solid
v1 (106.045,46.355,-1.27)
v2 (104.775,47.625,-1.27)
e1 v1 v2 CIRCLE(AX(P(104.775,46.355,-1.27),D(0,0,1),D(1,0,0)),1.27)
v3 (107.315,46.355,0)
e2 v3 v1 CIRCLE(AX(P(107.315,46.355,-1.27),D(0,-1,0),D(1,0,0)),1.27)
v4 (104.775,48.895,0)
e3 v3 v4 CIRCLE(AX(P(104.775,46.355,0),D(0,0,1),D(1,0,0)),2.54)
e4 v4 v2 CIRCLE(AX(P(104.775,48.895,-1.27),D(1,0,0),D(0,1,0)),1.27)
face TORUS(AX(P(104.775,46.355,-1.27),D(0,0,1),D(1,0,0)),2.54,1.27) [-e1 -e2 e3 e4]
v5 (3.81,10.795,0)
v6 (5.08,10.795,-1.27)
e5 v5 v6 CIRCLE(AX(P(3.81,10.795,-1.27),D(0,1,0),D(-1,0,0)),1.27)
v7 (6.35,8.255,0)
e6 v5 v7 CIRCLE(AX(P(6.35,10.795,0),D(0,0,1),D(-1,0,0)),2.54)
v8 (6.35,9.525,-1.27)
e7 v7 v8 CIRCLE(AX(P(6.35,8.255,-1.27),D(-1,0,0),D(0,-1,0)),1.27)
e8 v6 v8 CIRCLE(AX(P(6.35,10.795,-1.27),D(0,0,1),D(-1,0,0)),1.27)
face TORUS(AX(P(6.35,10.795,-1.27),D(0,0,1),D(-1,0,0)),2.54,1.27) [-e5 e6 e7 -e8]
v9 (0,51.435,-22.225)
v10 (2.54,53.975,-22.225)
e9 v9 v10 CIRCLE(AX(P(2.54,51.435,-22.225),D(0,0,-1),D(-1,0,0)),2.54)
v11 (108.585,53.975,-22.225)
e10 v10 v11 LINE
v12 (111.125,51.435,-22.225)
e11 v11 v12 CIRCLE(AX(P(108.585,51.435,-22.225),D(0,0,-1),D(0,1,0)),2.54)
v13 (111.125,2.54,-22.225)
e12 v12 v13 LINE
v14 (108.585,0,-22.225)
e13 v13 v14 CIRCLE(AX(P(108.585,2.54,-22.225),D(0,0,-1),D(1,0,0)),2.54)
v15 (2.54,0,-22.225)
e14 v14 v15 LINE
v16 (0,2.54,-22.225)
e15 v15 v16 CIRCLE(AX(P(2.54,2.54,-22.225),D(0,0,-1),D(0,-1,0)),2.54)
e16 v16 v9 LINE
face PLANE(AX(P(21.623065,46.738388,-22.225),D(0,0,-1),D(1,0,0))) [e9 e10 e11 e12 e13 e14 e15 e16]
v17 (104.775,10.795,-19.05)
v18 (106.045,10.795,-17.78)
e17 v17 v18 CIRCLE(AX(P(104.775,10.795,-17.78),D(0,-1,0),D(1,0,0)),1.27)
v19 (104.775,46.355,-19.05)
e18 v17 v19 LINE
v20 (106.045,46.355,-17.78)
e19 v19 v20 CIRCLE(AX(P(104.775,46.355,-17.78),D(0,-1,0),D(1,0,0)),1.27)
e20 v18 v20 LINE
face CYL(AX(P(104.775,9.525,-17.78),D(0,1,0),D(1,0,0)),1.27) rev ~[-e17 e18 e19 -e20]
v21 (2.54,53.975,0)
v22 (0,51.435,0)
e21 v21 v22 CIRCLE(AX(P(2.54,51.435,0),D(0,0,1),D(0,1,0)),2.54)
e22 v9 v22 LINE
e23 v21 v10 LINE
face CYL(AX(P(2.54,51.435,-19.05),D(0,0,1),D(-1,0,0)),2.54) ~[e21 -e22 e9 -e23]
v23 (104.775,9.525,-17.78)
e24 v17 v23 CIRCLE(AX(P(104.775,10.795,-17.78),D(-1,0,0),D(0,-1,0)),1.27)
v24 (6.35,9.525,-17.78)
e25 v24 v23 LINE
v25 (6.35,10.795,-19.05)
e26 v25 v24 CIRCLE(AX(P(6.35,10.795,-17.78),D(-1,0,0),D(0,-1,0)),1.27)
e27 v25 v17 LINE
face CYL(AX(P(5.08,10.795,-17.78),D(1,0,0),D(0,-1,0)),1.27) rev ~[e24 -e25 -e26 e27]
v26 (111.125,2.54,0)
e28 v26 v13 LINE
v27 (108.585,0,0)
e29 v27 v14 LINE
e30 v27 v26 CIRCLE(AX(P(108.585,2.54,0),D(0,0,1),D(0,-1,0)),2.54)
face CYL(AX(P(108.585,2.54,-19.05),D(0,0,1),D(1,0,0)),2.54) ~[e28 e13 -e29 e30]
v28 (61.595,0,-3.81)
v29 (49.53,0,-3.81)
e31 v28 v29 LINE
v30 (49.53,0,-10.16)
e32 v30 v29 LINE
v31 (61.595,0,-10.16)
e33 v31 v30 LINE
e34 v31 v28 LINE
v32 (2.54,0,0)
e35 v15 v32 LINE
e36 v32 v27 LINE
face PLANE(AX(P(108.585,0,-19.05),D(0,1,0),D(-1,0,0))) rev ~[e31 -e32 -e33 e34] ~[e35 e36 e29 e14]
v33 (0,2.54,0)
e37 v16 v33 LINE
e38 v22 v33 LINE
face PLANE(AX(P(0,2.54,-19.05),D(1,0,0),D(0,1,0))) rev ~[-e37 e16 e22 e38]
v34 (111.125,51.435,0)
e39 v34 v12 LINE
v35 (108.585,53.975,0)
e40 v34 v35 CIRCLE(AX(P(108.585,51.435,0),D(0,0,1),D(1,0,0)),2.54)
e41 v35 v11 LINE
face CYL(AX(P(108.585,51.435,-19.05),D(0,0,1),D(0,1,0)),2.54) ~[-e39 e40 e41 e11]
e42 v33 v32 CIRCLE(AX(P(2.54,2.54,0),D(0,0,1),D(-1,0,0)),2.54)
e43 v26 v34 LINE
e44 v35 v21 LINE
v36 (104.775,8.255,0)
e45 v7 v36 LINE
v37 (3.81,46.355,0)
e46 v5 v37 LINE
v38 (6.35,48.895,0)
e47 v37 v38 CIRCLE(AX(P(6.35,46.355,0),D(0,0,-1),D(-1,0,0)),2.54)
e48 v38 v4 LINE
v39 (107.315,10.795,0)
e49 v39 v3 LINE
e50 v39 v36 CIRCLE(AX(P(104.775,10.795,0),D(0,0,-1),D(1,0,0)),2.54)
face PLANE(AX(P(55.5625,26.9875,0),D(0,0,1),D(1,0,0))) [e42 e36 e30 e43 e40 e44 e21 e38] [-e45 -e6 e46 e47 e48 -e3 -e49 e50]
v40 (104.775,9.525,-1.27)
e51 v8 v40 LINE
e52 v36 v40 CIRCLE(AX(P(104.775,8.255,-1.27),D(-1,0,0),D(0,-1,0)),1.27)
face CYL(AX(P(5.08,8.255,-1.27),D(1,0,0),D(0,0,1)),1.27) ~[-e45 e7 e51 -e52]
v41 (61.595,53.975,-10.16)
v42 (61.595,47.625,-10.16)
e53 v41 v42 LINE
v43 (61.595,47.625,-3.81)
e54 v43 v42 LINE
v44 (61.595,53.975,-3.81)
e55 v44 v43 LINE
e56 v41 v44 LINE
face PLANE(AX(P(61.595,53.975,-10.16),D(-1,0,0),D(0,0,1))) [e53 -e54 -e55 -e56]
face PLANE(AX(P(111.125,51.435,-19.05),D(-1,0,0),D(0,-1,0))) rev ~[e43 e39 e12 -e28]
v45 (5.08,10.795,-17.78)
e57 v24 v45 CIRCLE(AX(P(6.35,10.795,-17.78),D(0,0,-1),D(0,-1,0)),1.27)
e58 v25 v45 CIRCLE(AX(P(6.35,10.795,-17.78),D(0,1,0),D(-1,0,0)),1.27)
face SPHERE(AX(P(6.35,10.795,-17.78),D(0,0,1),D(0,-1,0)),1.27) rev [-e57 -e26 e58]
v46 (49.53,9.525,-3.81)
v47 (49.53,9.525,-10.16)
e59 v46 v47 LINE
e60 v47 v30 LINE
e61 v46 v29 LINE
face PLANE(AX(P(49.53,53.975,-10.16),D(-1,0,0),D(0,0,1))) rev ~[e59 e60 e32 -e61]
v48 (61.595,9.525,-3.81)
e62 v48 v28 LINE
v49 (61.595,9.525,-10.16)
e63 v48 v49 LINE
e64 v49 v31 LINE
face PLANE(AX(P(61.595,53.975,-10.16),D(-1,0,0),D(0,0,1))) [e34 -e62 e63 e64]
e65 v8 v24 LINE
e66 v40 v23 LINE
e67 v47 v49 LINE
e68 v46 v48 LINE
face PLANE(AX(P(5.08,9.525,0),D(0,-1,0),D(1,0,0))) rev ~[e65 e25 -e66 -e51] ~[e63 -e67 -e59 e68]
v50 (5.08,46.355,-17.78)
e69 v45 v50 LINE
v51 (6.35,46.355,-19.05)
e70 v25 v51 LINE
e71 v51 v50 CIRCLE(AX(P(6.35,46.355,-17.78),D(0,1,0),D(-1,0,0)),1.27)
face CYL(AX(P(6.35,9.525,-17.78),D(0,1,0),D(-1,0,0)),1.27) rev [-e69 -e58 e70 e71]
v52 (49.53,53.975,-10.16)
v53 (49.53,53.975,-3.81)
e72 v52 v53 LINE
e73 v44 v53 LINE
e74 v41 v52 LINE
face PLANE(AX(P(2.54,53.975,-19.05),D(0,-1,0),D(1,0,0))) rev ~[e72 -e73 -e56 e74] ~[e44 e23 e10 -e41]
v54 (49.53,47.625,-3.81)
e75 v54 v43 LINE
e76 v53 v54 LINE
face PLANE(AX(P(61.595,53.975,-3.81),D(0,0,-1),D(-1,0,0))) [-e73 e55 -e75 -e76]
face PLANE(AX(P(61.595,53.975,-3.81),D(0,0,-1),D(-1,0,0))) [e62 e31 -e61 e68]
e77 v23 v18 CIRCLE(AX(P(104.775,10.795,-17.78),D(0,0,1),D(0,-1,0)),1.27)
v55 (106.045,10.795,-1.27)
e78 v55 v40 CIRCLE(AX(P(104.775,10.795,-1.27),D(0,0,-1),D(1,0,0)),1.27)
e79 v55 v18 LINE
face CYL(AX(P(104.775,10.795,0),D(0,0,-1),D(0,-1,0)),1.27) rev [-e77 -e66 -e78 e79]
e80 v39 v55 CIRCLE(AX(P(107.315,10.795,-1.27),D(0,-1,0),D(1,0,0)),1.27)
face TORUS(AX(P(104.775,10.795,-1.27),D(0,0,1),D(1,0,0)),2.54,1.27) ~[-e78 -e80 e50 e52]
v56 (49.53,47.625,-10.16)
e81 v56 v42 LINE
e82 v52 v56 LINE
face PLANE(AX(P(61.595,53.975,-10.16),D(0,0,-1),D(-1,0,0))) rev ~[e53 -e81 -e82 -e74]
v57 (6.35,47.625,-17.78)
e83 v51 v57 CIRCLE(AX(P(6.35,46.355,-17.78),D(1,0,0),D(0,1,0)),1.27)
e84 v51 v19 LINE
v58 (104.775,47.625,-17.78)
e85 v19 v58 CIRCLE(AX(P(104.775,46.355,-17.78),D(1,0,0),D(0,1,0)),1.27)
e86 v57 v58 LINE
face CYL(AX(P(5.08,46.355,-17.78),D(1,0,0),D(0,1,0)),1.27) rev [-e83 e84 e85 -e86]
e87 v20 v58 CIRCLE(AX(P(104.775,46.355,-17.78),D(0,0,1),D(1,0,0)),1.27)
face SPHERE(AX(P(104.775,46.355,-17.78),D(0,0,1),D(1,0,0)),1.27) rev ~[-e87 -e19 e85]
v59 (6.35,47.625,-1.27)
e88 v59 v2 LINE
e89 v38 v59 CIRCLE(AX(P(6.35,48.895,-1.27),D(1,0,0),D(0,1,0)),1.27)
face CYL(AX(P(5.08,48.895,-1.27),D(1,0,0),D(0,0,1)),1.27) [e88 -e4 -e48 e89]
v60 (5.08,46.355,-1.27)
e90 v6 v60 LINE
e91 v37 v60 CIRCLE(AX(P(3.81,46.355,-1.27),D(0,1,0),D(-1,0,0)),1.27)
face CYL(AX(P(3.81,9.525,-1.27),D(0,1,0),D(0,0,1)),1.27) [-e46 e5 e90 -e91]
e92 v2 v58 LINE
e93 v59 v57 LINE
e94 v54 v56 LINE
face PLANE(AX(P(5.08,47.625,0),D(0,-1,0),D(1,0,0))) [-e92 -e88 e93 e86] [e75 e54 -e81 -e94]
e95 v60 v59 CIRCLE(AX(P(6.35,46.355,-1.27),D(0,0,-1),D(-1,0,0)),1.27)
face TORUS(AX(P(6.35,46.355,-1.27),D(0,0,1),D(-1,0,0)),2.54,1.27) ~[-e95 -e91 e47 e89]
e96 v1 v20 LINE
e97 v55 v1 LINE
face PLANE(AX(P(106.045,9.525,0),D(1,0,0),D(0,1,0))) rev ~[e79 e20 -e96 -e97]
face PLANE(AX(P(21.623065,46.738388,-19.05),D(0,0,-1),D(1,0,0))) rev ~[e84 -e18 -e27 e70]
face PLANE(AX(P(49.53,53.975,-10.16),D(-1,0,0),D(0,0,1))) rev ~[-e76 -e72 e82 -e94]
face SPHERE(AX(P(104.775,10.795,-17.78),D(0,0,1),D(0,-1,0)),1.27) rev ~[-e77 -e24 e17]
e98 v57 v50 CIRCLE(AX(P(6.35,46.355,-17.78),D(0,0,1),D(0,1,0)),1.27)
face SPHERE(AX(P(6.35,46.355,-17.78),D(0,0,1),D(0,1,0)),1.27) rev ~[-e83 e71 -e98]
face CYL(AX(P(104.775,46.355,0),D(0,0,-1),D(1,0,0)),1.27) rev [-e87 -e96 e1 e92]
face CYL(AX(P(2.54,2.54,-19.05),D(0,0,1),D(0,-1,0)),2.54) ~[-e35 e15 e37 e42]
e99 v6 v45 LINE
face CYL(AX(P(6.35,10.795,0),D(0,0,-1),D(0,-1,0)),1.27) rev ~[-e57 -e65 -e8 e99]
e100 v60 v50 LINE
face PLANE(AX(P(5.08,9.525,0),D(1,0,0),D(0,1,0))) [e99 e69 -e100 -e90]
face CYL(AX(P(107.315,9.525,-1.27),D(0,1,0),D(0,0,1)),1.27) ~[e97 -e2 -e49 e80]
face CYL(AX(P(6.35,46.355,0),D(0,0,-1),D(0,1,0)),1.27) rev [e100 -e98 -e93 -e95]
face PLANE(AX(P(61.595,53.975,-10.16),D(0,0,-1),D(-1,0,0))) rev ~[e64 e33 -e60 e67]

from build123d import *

# Parameters (mm, degrees)
F0_W     = 100.965
F0_H     = 38.1
F1_DEPTH = 19.05
F2_W     = 50.4825
F2_H     = 20.6375
F2_H_2   = 17.4625
F3_DEPTH = 3.175
F4_W     = 12.065
F4_H     = 6.35
F5_DEPTH = 53.976
F6_R     = 1.27


with BuildPart() as f1:
    # F0 (on Top) → F1 (new body)
    with BuildSketch(Plane.XY):
        with BuildLine():
            ThreePointArc((0, 2.54), (0.7439487758, 0.7439487758), (2.54, 0))
            Line((2.54, 0), (108.585, 0))
            ThreePointArc((108.585, 0), (110.3810512242, 0.7439487758), (111.125, 2.54))
            Line((111.125, 2.54), (111.125, 51.435))
            ThreePointArc((111.125, 51.435), (110.3810512242, 53.2310512242), (108.585, 53.975))
            Line((108.585, 53.975), (2.54, 53.975))
            ThreePointArc((2.54, 53.975), (0.7439487758, 53.2310512242), (0, 51.435))
            Line((0, 51.435), (0, 2.54))
        make_face()
        with Locations((55.5625, 28.575)):
            Rectangle(F0_W, F0_H, mode=Mode.SUBTRACT)
    extrude(amount=-F1_DEPTH)

    # F2 (on face) → F3 (join)
    with BuildSketch(Plane(origin=(0, 0, -19.05), x_dir=(1, 0, 0), z_dir=(0, 0, -1))):
        with BuildLine():
            ThreePointArc((0, -51.435), (0.7439487758, -53.2310512242), (2.54, -53.975))
            Line((2.54, -53.975), (55.5625, -53.975))
            Line((55.5625, -53.975), (55.5625, -47.625))
            Line((55.5625, -47.625), (5.08, -47.625))
            Line((5.08, -47.625), (5.08, -26.9875))
            Line((5.08, -26.9875), (0, -26.9875))
            Line((0, -26.9875), (0, -51.435))
        make_face()
        with BuildLine():
            Line((55.5625, -47.625), (55.5625, -53.975))
            Line((55.5625, -53.975), (108.585, -53.975))
            ThreePointArc((108.585, -53.975), (110.3810512242, -53.2310512242), (111.125, -51.435))
            Line((111.125, -51.435), (111.125, -26.9875))
            Line((111.125, -26.9875), (106.045, -26.9875))
            Line((106.045, -26.9875), (106.045, -47.625))
            Line((106.045, -47.625), (55.5625, -47.625))
        make_face()
        with BuildLine():
            Line((0, -2.54), (0, -26.9875))
            Line((0, -26.9875), (5.08, -26.9875))
            Line((5.08, -26.9875), (5.08, -9.525))
            Line((5.08, -9.525), (55.5625, -9.525))
            Line((55.5625, -9.525), (55.5625, 0))
            Line((55.5625, 0), (2.54, 0))
            ThreePointArc((2.54, 0), (0.7439487758, -0.7439487758), (0, -2.54))
        make_face()
        with BuildLine():
            Line((106.045, -26.9875), (111.125, -26.9875))
            Line((111.125, -26.9875), (111.125, -2.54))
            ThreePointArc((111.125, -2.54), (110.3810512242, -0.7439487758), (108.585, 0))
            Line((108.585, 0), (55.5625, 0))
            Line((55.5625, 0), (55.5625, -9.525))
            Line((55.5625, -9.525), (106.045, -9.525))
            Line((106.045, -9.525), (106.045, -26.9875))
        make_face()
        with Locations((30.32125, -37.30625)):
            Rectangle(F2_W, F2_H)
        with Locations((30.32125, -18.25625)):
            Rectangle(F2_W, F2_H_2)
        with Locations((80.80375, -18.25625)):
            Rectangle(F2_W, F2_H_2)
        with Locations((80.80375, -37.30625)):
            Rectangle(F2_W, F2_H)
    extrude(amount=F3_DEPTH)

    # F4 (on face) → F5 (cut, through all)
    with BuildSketch(Plane(origin=(0, 53.975, 0), x_dir=(-1, 0, 0), z_dir=(0, 1, 0))):
        with Locations((-55.5625, -6.985)):
            Rectangle(F4_W, F4_H)
    extrude(amount=-F5_DEPTH, mode=Mode.SUBTRACT)

    # F6
    f6_edges = [f1.edges().sort_by_distance(p)[0] for p in [
        (5.08, 47.625, -9.525),
        (106.045, 47.625, -9.525),
        (5.08, 9.525, -9.525),
        (106.045, 9.525, -9.525),
        (55.5625, 9.525, -19.05),
        (106.045, 28.575, -19.05),
        (55.5625, 47.625, -19.05),
        (5.08, 28.575, -19.05),
        (106.045, 28.575, 0),
        (5.08, 28.575, 0),
        (55.5625, 47.625, 0),
        (55.5625, 9.525, 0),
    ]]
    fillet(f6_edges, radius=F6_R)


solid = f1.part
